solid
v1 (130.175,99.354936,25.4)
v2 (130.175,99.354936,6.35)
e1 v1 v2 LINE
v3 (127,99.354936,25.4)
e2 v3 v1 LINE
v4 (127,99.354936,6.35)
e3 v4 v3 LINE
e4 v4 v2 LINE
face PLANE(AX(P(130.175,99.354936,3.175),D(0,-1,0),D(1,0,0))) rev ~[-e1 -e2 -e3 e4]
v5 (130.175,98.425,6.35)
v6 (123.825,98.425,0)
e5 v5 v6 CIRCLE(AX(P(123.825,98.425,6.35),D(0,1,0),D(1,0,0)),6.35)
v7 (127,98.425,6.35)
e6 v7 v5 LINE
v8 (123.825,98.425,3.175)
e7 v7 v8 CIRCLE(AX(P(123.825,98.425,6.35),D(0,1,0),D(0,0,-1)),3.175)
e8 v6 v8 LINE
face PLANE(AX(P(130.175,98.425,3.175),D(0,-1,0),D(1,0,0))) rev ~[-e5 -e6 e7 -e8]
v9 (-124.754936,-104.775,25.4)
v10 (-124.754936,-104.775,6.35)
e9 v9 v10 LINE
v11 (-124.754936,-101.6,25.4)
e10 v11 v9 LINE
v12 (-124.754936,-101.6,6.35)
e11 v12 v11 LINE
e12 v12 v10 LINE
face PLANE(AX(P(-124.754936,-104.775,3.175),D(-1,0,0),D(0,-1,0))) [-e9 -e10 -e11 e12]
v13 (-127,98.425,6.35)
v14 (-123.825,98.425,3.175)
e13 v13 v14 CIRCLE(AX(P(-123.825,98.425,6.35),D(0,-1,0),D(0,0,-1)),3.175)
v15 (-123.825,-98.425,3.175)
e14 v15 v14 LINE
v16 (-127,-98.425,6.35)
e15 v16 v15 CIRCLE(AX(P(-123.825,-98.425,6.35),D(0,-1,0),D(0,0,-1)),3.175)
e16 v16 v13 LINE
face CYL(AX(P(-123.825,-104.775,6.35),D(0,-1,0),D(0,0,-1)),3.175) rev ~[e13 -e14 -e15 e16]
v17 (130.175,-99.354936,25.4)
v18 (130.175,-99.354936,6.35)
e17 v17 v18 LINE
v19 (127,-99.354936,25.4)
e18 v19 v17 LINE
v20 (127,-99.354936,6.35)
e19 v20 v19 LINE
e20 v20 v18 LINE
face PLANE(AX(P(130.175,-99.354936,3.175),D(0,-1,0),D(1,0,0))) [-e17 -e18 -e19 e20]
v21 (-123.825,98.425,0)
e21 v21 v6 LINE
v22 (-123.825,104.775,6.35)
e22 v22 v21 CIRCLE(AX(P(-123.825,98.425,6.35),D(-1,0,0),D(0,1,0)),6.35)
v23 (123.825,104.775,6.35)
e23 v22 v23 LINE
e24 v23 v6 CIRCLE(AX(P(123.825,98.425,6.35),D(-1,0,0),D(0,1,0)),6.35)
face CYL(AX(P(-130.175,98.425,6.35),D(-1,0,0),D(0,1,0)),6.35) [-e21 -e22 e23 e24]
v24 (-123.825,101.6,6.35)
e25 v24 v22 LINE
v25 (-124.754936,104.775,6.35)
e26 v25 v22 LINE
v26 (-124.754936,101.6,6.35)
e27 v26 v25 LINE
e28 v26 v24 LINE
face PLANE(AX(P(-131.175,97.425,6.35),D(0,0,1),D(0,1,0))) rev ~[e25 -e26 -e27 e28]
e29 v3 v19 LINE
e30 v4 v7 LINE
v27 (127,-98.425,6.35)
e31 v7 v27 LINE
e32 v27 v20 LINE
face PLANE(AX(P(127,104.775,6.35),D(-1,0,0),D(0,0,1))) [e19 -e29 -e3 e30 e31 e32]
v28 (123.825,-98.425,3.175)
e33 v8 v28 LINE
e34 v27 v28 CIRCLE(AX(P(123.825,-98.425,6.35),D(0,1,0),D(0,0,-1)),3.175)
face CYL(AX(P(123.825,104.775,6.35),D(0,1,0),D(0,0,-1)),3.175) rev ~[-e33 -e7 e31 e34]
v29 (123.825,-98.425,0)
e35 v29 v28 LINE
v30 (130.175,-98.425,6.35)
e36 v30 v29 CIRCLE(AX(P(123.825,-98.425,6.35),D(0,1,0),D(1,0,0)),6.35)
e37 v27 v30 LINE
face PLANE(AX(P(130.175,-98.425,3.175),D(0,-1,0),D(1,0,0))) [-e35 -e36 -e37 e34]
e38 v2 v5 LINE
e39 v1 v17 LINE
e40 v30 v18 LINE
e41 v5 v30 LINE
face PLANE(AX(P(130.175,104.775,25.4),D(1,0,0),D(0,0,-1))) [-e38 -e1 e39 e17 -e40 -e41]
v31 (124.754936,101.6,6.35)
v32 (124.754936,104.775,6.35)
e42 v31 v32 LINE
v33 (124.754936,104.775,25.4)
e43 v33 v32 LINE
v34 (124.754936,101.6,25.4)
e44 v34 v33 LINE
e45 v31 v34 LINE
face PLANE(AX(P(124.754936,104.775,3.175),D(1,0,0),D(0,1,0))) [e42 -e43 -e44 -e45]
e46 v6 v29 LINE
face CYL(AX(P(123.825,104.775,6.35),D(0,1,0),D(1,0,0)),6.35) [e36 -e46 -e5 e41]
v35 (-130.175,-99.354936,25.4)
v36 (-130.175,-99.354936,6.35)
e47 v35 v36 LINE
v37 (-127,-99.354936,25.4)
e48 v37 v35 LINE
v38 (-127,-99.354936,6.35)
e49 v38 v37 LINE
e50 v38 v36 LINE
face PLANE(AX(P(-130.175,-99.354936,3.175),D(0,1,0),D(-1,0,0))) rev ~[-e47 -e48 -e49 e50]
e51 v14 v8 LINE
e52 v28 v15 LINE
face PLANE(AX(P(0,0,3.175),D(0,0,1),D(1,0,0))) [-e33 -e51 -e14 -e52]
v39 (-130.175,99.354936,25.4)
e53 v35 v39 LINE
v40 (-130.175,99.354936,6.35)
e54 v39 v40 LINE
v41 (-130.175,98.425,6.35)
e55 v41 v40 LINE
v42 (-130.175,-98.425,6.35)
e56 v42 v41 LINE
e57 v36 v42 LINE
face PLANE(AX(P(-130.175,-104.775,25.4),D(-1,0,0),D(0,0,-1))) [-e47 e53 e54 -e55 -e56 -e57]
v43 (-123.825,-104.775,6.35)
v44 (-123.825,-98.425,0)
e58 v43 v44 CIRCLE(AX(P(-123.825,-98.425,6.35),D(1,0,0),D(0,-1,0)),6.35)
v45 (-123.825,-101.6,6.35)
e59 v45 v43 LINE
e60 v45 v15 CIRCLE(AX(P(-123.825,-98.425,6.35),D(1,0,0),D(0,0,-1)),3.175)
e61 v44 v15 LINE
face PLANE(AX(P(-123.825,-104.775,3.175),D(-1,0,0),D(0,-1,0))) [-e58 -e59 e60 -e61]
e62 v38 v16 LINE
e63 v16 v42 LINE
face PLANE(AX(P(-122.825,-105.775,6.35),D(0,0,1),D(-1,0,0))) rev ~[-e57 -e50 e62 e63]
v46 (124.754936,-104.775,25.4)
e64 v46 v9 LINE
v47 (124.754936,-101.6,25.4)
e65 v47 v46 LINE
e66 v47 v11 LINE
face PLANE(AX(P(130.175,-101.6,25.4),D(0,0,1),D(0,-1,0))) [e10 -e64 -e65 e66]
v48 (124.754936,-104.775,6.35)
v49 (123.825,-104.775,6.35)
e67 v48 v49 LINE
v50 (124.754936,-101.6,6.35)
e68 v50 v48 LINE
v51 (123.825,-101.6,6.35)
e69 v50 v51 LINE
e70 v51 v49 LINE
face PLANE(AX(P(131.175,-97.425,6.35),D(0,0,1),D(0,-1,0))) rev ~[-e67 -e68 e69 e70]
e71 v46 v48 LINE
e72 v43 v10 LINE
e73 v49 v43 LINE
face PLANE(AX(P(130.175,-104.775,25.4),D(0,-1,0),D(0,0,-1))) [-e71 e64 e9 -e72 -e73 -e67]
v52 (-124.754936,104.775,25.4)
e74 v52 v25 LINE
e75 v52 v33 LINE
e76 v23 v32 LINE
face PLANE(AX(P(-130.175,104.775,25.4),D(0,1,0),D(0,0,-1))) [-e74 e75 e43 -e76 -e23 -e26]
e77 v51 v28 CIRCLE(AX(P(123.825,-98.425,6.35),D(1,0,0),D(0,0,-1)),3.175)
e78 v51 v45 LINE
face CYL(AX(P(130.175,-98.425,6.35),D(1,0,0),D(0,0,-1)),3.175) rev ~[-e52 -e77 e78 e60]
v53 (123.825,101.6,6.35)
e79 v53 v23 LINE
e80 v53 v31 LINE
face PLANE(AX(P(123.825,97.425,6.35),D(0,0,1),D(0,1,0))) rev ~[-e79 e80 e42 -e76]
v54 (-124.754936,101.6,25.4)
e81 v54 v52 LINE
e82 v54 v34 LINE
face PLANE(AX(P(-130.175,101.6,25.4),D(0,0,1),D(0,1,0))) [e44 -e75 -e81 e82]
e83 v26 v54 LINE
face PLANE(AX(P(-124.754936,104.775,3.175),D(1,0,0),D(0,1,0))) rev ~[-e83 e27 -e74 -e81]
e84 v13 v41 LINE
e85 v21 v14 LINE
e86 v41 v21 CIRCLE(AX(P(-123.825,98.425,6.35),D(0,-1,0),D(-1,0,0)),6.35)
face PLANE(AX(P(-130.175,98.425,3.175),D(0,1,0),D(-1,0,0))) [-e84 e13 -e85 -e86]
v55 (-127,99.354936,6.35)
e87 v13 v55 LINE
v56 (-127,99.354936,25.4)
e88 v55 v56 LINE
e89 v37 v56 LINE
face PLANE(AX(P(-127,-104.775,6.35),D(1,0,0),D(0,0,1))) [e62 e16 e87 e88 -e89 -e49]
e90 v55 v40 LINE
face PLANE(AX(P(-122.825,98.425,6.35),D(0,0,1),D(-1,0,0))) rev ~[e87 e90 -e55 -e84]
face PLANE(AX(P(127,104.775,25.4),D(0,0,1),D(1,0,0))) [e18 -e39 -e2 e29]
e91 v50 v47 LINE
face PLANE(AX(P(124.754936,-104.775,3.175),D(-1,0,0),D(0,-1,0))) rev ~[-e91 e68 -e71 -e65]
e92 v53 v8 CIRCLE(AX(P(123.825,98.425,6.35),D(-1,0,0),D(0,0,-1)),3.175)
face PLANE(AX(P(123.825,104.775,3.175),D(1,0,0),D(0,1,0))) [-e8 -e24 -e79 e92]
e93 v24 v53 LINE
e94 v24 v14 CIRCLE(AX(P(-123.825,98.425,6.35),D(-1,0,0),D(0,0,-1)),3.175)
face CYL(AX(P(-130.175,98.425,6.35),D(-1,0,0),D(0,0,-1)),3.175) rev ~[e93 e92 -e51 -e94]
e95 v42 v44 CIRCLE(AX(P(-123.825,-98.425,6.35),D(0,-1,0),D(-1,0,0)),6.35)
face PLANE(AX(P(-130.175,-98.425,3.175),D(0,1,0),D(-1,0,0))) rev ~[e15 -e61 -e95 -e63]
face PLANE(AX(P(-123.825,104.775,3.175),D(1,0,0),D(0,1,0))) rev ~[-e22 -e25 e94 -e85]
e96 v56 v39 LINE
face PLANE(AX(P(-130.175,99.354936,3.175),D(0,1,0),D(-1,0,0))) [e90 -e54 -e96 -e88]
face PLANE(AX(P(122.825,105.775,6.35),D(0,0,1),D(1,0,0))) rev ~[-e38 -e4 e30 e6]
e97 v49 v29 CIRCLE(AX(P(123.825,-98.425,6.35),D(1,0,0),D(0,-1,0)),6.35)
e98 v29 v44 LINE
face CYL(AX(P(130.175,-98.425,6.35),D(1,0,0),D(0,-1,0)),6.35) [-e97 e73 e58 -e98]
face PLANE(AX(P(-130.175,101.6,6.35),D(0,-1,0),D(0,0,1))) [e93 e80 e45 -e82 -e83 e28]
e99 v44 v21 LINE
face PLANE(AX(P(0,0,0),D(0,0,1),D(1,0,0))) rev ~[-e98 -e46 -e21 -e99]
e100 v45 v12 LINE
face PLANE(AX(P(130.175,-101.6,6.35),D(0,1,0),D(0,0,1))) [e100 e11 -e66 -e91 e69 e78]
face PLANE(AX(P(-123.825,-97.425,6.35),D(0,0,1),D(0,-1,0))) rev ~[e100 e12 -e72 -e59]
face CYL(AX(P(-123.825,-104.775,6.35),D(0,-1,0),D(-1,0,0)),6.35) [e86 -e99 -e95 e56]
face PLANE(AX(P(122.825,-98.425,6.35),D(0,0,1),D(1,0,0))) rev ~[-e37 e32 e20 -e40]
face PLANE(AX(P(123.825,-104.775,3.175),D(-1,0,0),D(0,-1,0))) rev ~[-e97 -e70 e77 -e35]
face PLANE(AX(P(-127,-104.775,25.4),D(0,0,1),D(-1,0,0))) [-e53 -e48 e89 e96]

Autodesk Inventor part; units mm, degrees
ref_plane "YZ Plane" through (0, 0, 0) normal (1, 0, 0) x (0, 1, 0)
ref_plane "XZ Plane" through (0, 0, 0) normal (0, 1, 0) x (-1, 0, 0)
ref_plane "XY Plane" through (0, 0, 0) normal (0, 0, 1) x (1, 0, 0)
sketch "Sketch1" plane through (0, 0, 0) normal (0, 0, 1) x (1, 0, 0)
  line L0 (130.175, -104.775) -> (-130.175, -104.775)
  line L1 (-130.175, -104.775) -> (-130.175, 104.775)
  line L2 (-130.175, 104.775) -> (130.175, 104.775)
  line L3 (130.175, 104.775) -> (130.175, -104.775)
  line L4 (130.175, -104.775) -> (-130.175, 104.775) construction
  line L5 (-130.175, -104.775) -> (130.175, 104.775) construction
  point P0 (0, 0)
  dimension "d0" = 260.35
  dimension "d1" = 209.55
extrude "Plate1" add sketch "Sketch1" along normal blind 3.175
sketch "Sketch2" plane through (130.175, -101.6, 0) normal (0, -1, 0) x (1, 0, 0)
  line L0 (-260.35, 0) -> (0, 0)
  line L1 (0, 0) -> (0, 25.4)
  line L2 (0, 25.4) -> (-260.35, 25.4)
  line L3 (-260.35, 25.4) -> (-260.35, 0)
edge flange "Flange1" height 25.4 angle 90 thickness 3.175 bend radius 3.175 thickness toward (0, -1, 0) relief tear relief width 3.175 relief depth 1.5875 corner gap 3.175 corner form 2 edges at (0, -104.775, 3.175) (130.175, 0, 3.175) (0, 104.775, 3.175) (-130.175, 0, 3.175) wall of the first edge with corners at (-130.175, -101.6, 0) (130.175, -101.6, 0) (130.175, -101.6, 25.4) (-130.175, -101.6, 25.4)
bend "Bend1"
corner "Corner1"
equation "\"d0\" = MachineMaxLength - 2 * Thickness"
equation "\"d1\" = MachineMaxWidth - 2 * Thickness"
equation "\"d2\" = Thickness"
equation "\"d3\" = BendReliefWidth"
equation "\"d4\" = BendReliefDepth"
equation "\"d5\" = MinimumRemnant"
equation "\"d6\" = TransitionRadius"
equation "\"d9\" = BendRadius"
equation "\"d10\" = CornerReliefSize"
equation "\"d11\" = GapSize"
equation "\"d12\" = JacobiRadiusSize"
equation "\"BendRadius\" = Thickness"
equation "\"BendReliefWidth\" = Thickness"
equation "\"BendReliefDepth\" = 0.5 * Thickness"
equation "\"CornerReliefSize\" = 4 * Thickness"
equation "\"MinimumRemnant\" = 2 * Thickness"
equation "\"TransitionRadius\" = BendRadius"
equation "\"JacobiRadiusSize\" = BendRadius"
equation "\"GapSize\" = Thickness"
equation "\"MachineMaxHeight\" = 539.75"
equation "\"MachineMaxWidth\" = 215.9"
equation "\"MachineMaxLength\" = 266.7"
equation "\"MachineFluidCapacity\" = 25.4"
equation "\"MaxCompressiveCapacity\" = 20320"
equation "\"WashChamberOD\" = 114.3"
equation "\"WashChamberID\" = 101.6"
equation "\"ConduitThickness\" = 152.4"
equation "\"SealedSurfaceOffset\" = 0.15875"
equation "\"StaticORingThickness\" = 4.7625"
equation "\"Thickness\" = 3.175"
properties part number "FrameBase" material "Stainless Steel"
